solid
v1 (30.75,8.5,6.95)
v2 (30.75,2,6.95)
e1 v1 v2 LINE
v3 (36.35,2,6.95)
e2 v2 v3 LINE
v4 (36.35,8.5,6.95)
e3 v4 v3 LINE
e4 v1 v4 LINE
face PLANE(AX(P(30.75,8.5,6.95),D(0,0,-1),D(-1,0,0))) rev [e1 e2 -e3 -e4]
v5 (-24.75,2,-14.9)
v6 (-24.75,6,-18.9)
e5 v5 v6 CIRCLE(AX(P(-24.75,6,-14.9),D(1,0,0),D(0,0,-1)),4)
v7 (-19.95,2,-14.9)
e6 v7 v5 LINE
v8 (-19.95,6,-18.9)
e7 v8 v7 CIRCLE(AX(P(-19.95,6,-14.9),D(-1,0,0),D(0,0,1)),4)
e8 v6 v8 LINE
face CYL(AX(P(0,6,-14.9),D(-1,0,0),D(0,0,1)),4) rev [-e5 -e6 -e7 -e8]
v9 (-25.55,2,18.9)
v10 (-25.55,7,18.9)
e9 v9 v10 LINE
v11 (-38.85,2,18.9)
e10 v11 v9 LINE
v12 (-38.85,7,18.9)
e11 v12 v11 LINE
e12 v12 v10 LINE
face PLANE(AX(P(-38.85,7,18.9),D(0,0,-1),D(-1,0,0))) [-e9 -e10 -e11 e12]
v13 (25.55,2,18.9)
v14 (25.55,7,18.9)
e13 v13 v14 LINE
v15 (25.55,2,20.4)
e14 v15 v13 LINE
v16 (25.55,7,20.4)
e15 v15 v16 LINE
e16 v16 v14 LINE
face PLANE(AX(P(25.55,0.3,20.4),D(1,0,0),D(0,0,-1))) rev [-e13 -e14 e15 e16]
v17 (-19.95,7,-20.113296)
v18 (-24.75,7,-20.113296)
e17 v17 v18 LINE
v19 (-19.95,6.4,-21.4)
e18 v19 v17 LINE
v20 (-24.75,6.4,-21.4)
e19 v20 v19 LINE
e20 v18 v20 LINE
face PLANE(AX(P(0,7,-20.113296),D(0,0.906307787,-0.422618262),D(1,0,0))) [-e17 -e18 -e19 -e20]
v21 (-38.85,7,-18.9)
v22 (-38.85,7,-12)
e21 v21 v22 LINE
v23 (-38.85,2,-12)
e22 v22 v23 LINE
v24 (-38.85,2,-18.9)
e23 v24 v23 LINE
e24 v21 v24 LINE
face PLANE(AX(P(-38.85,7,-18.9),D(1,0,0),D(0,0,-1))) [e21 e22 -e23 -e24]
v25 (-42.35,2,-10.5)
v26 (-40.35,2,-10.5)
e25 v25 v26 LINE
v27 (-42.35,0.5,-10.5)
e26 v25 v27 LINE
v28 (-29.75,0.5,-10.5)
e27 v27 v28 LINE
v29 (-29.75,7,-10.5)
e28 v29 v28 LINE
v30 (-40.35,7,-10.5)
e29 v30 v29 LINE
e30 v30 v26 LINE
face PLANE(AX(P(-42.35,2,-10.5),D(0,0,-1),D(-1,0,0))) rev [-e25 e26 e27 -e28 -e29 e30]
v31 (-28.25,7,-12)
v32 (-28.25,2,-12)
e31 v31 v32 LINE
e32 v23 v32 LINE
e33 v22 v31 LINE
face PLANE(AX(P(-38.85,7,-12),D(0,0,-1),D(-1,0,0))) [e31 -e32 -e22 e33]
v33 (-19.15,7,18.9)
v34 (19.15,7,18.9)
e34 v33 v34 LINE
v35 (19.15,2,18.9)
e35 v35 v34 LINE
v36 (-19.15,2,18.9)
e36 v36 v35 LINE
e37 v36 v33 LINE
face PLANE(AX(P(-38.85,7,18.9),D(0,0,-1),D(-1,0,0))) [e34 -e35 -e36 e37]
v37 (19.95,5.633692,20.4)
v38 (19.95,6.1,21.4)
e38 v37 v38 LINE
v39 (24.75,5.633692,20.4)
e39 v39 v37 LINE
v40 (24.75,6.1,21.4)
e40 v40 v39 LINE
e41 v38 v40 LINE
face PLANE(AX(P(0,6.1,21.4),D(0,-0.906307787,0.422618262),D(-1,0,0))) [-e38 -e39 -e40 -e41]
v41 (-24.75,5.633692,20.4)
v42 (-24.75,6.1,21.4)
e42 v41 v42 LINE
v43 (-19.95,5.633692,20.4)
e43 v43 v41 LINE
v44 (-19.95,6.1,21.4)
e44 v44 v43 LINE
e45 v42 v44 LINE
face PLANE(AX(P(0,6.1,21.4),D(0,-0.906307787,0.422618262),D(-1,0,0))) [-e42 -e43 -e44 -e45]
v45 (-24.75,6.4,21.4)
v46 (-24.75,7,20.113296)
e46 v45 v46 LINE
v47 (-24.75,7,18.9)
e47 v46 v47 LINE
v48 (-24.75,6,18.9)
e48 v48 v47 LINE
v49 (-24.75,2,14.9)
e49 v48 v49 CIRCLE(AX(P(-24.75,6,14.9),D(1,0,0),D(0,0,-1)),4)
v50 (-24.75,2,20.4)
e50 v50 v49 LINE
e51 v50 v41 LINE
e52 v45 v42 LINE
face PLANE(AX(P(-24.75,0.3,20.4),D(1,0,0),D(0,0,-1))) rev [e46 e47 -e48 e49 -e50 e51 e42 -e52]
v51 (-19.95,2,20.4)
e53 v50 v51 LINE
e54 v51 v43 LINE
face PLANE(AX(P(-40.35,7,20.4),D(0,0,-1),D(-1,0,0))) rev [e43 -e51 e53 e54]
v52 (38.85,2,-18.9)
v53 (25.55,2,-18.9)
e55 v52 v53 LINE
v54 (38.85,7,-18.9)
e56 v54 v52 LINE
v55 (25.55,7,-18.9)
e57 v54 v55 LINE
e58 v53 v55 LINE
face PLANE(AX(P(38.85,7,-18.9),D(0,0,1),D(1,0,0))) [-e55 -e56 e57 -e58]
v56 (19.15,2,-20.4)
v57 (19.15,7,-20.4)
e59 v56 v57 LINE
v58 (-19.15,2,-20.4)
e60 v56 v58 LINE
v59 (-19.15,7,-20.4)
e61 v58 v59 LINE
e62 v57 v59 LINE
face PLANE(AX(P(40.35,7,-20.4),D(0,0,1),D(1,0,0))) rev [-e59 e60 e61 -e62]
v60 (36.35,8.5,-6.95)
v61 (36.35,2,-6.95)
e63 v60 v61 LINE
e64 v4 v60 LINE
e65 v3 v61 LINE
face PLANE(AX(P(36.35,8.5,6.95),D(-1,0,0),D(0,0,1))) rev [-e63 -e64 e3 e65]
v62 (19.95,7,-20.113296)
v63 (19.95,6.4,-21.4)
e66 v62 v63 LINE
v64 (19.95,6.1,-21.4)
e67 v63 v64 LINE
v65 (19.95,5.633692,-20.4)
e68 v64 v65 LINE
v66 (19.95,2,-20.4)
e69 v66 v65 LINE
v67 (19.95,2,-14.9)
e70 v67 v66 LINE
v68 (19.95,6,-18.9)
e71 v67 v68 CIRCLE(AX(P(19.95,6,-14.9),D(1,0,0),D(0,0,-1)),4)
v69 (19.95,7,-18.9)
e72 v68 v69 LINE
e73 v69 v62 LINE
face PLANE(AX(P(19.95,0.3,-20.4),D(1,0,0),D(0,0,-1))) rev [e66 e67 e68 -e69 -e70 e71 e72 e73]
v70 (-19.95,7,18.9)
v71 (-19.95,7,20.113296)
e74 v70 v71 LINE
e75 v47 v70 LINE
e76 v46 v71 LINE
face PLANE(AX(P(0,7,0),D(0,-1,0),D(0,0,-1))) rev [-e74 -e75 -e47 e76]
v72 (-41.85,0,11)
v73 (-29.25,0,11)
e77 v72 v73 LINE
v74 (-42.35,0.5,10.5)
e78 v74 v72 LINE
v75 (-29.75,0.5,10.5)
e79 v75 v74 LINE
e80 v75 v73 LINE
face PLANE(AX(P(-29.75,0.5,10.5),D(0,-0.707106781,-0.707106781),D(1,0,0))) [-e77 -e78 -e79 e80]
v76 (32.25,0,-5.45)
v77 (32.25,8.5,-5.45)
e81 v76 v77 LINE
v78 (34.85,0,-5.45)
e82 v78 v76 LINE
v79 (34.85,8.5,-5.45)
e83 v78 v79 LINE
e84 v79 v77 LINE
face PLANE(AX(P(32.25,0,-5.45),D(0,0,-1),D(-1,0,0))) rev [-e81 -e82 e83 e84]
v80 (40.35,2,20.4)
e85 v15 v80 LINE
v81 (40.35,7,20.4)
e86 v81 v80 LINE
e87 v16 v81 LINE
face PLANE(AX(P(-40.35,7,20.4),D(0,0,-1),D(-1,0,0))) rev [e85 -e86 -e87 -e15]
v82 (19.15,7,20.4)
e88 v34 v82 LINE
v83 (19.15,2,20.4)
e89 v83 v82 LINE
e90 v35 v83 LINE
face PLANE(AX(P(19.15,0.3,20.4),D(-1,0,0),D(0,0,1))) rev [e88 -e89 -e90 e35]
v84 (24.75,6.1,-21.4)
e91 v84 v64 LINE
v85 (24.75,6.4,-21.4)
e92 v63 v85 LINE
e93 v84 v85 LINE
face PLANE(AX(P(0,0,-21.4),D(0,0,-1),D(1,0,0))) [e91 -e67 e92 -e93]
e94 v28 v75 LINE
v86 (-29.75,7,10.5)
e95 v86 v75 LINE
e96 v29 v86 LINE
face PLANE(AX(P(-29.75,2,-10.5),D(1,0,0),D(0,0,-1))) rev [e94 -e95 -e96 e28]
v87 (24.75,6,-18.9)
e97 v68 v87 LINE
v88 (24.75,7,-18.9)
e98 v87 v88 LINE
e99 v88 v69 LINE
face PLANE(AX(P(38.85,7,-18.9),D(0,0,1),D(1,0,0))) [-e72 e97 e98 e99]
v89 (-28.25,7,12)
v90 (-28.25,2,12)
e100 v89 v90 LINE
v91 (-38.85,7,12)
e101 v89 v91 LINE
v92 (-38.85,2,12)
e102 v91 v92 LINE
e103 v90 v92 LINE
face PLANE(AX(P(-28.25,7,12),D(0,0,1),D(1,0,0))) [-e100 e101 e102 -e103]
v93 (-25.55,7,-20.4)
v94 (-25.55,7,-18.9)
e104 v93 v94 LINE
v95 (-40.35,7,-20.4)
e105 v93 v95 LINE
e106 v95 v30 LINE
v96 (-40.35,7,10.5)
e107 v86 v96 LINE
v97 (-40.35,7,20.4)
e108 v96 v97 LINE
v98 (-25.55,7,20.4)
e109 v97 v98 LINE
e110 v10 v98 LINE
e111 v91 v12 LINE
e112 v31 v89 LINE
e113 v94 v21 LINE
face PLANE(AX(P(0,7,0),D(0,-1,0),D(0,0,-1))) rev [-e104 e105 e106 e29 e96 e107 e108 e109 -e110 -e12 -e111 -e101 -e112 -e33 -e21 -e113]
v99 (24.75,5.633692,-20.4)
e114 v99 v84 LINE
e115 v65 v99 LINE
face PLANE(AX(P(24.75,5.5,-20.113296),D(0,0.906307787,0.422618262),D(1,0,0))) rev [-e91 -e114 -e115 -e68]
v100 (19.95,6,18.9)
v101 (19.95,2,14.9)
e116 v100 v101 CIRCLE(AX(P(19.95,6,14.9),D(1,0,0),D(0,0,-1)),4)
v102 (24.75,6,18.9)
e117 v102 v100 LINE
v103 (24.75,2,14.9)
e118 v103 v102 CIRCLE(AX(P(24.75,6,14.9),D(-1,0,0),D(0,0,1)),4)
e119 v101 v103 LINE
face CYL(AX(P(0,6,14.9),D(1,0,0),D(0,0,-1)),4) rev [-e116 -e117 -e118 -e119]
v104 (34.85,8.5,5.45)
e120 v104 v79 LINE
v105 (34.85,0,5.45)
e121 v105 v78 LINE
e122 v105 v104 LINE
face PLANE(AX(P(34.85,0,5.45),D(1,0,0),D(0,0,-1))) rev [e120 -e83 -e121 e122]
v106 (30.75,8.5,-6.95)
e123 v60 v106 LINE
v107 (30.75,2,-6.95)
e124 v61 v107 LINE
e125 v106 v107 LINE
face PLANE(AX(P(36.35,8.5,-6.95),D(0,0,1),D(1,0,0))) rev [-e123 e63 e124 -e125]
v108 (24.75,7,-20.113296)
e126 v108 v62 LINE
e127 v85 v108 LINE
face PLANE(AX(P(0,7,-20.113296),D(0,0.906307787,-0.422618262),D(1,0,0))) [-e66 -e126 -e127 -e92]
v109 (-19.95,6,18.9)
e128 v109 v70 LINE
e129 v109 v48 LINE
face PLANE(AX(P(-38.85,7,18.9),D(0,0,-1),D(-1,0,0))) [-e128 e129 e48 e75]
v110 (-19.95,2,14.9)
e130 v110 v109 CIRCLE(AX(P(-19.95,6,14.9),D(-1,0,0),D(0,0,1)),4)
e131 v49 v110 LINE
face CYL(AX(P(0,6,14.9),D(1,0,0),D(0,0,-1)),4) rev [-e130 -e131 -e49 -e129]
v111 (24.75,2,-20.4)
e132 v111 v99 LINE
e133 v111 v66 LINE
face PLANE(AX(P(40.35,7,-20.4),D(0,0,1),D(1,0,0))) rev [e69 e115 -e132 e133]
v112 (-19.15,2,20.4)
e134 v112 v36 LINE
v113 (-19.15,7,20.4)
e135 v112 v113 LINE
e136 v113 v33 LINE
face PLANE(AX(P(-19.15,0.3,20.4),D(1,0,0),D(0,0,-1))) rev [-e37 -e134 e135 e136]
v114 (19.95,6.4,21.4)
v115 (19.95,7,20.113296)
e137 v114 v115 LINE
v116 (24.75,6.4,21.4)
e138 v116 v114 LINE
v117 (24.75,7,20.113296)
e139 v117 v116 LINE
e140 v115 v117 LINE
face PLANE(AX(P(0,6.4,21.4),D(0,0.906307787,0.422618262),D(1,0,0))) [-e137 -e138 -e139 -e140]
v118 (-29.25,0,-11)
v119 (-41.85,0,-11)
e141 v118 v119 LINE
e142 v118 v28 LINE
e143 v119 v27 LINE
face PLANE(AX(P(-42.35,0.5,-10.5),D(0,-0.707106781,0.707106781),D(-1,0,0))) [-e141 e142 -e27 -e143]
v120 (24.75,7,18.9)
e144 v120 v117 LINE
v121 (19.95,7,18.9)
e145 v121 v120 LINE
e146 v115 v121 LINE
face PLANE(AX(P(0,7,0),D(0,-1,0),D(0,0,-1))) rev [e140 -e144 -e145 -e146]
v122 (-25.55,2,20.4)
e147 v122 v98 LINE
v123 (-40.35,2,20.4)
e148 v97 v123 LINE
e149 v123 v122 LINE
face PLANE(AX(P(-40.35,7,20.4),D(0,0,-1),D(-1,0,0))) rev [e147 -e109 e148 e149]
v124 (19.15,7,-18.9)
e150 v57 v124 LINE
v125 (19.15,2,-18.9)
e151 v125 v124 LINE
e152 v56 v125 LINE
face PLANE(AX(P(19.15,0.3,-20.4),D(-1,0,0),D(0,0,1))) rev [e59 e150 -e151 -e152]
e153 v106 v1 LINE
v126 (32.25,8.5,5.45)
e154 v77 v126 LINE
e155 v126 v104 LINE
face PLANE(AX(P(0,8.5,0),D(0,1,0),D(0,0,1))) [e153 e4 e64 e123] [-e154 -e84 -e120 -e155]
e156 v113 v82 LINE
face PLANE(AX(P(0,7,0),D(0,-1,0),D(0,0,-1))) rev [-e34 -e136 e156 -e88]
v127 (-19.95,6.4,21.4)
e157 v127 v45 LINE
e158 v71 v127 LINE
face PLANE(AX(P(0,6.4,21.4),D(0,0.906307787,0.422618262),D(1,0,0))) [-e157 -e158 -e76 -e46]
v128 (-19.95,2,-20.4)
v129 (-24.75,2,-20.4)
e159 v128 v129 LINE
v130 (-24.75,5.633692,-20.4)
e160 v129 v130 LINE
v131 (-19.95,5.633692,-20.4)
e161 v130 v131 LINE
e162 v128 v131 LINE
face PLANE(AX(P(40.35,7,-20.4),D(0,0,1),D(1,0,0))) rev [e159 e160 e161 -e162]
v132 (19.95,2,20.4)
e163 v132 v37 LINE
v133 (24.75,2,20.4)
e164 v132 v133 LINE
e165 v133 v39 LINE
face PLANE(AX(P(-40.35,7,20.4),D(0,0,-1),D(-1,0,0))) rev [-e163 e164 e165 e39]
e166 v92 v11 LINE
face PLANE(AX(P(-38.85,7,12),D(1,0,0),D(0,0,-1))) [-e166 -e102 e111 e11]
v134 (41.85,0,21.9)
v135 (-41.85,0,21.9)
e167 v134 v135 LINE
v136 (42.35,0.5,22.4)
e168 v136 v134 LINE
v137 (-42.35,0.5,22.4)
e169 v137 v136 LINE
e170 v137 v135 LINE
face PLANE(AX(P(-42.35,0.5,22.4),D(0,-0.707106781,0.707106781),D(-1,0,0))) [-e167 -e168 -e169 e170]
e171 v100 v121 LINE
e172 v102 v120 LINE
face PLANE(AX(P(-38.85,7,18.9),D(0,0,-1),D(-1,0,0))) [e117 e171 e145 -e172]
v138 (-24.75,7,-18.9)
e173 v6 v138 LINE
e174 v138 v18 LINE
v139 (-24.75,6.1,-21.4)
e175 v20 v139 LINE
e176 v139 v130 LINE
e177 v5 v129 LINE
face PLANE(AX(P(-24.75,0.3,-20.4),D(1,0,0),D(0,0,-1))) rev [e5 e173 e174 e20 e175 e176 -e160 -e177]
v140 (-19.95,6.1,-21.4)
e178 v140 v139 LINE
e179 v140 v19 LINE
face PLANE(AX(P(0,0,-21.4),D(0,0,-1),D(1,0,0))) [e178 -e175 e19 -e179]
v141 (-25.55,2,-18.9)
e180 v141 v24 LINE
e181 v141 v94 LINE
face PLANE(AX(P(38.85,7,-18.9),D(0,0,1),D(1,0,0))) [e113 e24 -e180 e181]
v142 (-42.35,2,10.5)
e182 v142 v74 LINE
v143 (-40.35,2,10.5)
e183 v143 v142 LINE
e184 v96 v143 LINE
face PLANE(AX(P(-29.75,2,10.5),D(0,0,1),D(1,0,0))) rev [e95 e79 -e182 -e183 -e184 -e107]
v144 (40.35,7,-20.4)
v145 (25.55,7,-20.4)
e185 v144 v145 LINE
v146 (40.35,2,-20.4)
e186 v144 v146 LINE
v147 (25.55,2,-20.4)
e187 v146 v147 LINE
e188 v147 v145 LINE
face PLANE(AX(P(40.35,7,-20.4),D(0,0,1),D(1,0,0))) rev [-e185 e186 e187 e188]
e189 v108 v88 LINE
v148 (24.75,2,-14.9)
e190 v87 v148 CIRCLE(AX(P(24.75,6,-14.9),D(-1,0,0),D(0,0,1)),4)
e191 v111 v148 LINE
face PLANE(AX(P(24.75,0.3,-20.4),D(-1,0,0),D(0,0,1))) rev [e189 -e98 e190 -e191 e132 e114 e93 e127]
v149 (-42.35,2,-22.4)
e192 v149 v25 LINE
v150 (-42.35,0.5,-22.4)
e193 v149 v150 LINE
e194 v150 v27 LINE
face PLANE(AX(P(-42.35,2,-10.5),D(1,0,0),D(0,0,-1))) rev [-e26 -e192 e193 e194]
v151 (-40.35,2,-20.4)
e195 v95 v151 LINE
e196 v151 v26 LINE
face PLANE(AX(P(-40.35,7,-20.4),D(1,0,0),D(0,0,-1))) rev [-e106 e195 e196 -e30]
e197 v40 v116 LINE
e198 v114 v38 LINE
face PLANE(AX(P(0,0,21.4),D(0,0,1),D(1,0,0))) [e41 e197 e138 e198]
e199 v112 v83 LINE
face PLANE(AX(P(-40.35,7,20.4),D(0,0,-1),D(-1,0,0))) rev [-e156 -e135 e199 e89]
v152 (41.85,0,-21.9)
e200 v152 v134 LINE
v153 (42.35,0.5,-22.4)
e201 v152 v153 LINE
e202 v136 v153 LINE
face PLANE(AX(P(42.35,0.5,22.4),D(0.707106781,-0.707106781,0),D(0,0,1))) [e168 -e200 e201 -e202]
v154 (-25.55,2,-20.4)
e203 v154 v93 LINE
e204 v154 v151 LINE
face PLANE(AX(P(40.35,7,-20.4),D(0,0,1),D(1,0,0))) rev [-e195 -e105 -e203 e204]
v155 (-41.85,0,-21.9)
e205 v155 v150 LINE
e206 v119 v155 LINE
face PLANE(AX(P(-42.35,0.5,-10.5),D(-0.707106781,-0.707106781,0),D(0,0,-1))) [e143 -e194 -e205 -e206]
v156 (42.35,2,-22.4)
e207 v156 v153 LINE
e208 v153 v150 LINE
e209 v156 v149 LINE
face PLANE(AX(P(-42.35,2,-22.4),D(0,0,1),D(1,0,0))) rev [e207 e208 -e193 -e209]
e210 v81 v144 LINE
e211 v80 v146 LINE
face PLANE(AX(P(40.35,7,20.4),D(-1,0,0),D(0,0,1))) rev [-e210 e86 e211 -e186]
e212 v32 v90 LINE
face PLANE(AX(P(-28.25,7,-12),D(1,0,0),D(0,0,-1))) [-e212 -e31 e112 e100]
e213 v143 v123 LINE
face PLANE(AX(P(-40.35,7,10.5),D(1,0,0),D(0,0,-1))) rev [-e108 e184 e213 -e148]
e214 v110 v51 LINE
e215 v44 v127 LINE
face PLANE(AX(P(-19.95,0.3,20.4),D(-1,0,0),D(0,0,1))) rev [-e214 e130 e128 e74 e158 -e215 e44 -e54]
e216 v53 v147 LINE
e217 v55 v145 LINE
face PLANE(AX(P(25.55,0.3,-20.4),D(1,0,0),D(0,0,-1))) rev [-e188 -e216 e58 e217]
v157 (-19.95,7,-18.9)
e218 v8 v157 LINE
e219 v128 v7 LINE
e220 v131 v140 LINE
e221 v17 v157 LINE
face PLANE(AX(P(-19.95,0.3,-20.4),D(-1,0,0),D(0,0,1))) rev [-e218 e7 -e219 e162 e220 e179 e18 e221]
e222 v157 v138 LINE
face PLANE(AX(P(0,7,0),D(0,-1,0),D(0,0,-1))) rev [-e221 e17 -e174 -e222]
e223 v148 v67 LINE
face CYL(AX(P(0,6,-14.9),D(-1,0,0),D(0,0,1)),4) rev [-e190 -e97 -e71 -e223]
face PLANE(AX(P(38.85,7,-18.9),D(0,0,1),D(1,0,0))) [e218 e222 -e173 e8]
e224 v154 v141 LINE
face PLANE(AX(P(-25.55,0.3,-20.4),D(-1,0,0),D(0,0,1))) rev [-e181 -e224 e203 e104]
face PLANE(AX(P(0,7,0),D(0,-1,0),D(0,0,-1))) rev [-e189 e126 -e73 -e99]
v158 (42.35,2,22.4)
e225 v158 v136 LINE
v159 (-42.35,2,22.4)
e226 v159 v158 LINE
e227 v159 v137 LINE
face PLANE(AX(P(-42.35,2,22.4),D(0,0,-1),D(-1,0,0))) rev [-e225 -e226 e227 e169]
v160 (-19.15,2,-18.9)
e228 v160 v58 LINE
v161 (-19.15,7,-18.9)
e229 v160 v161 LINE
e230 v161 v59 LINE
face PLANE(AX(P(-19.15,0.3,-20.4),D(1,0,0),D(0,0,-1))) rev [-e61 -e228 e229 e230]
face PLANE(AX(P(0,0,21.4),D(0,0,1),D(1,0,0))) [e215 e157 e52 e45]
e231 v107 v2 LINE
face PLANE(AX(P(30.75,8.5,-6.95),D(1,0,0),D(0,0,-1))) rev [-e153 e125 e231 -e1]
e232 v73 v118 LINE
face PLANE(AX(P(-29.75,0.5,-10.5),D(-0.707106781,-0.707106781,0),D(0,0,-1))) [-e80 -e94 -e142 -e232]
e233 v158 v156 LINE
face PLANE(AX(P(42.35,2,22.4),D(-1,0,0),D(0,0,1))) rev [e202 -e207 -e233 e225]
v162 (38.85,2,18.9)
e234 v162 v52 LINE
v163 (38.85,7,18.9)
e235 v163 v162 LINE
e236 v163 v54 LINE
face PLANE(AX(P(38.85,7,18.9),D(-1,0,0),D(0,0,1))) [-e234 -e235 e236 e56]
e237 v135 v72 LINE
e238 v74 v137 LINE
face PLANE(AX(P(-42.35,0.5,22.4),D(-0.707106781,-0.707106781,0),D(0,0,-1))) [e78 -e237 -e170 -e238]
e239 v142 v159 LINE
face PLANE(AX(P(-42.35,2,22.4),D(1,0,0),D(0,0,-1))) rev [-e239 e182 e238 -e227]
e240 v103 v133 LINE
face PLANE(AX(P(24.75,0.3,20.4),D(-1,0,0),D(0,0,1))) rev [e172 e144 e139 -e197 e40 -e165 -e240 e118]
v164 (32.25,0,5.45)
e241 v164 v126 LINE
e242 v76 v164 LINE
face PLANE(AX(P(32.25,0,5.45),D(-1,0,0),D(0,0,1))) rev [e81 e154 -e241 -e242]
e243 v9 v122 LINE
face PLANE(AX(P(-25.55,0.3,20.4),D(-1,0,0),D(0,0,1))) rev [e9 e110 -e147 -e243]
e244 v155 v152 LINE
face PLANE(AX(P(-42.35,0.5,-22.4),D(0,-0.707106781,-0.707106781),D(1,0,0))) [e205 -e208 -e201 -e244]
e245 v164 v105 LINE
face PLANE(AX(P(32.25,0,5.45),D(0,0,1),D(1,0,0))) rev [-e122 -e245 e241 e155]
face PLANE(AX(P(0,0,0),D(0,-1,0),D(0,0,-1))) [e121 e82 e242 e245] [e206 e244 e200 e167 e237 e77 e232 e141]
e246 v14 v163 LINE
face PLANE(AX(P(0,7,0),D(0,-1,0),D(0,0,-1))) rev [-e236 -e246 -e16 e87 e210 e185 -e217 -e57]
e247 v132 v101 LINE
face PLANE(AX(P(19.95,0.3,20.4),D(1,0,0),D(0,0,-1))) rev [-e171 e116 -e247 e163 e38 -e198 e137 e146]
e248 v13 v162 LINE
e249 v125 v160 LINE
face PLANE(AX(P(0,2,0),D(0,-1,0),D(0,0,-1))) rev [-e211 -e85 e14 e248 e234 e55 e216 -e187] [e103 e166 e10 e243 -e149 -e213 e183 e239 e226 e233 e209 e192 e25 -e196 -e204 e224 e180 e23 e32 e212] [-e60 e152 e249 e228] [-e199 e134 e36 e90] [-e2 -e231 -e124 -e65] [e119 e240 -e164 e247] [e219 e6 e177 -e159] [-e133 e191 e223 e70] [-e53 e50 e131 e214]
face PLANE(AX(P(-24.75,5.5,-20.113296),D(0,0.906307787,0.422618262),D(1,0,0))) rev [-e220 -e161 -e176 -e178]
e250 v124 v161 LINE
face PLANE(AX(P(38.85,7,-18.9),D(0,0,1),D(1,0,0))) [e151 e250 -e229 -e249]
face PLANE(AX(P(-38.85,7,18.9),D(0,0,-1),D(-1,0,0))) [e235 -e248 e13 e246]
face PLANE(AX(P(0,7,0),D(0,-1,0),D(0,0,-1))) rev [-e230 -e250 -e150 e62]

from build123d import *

# Parameters (mm, degrees)
BOSS_EXTRUDE1_DEPTH = 2
BOSS_EXTRUDE2_DEPTH = 5
SKETCH3_W           = 0.8
SKETCH3_H           = 1.5
CUT_EXTRUDE1_DEPTH  = 5
SKETCH4_W           = 4.8
SKETCH4_H           = 1.5
BOSS_EXTRUDE3_DEPTH = 1
CHAMFER3_SIZE       = 0.6
CHAMFER3_SIZE_2     = 1.286704152
SKETCH6_W           = 2.6
SKETCH6_H           = 10.9
CUT_EXTRUDE2_DEPTH  = 49.169310769
SKETCH7_W           = 5.6
SKETCH7_H           = 13.9
SKETCH7_W_2         = 2.6
SKETCH7_H_2         = 10.9
BOSS_EXTRUDE4_DEPTH = 6.5
CHAMFER6_SIZE       = 0.5
FILLET1_R           = 4


with BuildPart() as part:
    # Sketch1 → Boss-Extrude1 (new body)
    with BuildSketch(Plane(origin=(0, 0, 0), x_dir=(1, 0, 0), z_dir=(0, 1, 0))):
        Polygon((-42.35, 10.5), (-29.75, 10.5), (-29.75, -10.5), (-42.35, -10.5), (-42.35, -22.4), (42.35, -22.4), (42.35, 22.4), (-42.35, 22.4), align=None)
    extrude(amount=BOSS_EXTRUDE1_DEPTH)

    # Sketch2 → Boss-Extrude2 (add)
    with BuildSketch(Plane(origin=(0, 2, 0), x_dir=(1, 0, 0), z_dir=(0, 1, 0))):
        Polygon((-40.35, 20.4), (-40.35, 10.5), (-29.75, 10.5), (-29.75, -10.5), (-40.35, -10.5), (-40.35, -20.4), (40.35, -20.4), (40.35, 20.4), align=None)
        Polygon((-38.85, -12), (-38.85, -18.9), (38.85, -18.9), (38.85, 18.9), (-38.85, 18.9), (-38.85, 12), (-28.25, 12), (-28.25, -12), align=None, mode=Mode.SUBTRACT)
    extrude(amount=BOSS_EXTRUDE2_DEPTH)

    # Sketch3 → Cut-Extrude1 (cut)
    with BuildSketch(Plane(origin=(0, 7, 0), x_dir=(1, 0, 0), z_dir=(0, 1, 0))):
        with Locations((-25.15, 19.65)):
            Rectangle(SKETCH3_W, SKETCH3_H)
        with Locations((-19.55, 19.65)):
            Rectangle(SKETCH3_W, SKETCH3_H)
        with Locations((-19.55, -19.65)):
            Rectangle(SKETCH3_W, SKETCH3_H)
        with Locations((-25.15, -19.65)):
            Rectangle(SKETCH3_W, SKETCH3_H)
        with Locations((19.55, 19.65)):
            Rectangle(SKETCH3_W, SKETCH3_H)
        with Locations((25.15, 19.65)):
            Rectangle(SKETCH3_W, SKETCH3_H)
        with Locations((25.15, -19.65)):
            Rectangle(SKETCH3_W, SKETCH3_H)
        with Locations((19.55, -19.65)):
            Rectangle(SKETCH3_W, SKETCH3_H)
    extrude(amount=-CUT_EXTRUDE1_DEPTH, mode=Mode.SUBTRACT)

    # Sketch4 → Boss-Extrude3 (add)
    with BuildSketch(Plane.XY.offset(20.4)):
        with Locations((-22.35, 6.25)):
            Rectangle(SKETCH4_W, SKETCH4_H)
        with Locations((22.35, 6.25)):
            Rectangle(SKETCH4_W, SKETCH4_H)
    boss_extrude3 = extrude(amount=BOSS_EXTRUDE3_DEPTH)

    # Mirror1: Boss-Extrude3 across plane
    add(boss_extrude3.mirror(Plane.XY))

    # Chamfer3
    # the kernel refuses this chamfer: 1.286704152, 0.6 mm, written as the material it takes off along each edge
    with BuildSketch(Plane(origin=(16.616181102, 5.5, -21.4), x_dir=(0, 0.9971975577536771, -0.07481330637060246), z_dir=(1, 0, 0))) as chamfer3_piece_1_section:
        Polygon((CHAMFER3_SIZE * 0.997197557754, CHAMFER3_SIZE * 0.0748133063706), (-CHAMFER3_SIZE_2 * 0.0748133063884, CHAMFER3_SIZE_2 * 0.997197557991), (0, 0), align=None)
    chamfer3_piece_1 = extrude(amount=11.467637795, mode=Mode.PRIVATE)
    chamfer3_piece_1 = split(chamfer3_piece_1, bisect_by=Plane(origin=(22.35, 5.708120407, -20.4), z_dir=(0, 0, -1)), keep=Keep.TOP, mode=Mode.PRIVATE)
    add(chamfer3_piece_1, mode=Mode.SUBTRACT)
    with BuildSketch(Plane(origin=(28.083818898, 7, -21.4), x_dir=(0, 0.016311164131109942, 0.9998669641130704), z_dir=(-1, 0, 0))) as chamfer3_piece_2_section:
        Polygon((CHAMFER3_SIZE_2 * 0.999866964351, -CHAMFER3_SIZE_2 * 0.016311164135), (-CHAMFER3_SIZE * 0.0163111641311, -CHAMFER3_SIZE * 0.999866964113), (0, 0), align=None)
    chamfer3_piece_2 = extrude(amount=8.133818898, mode=Mode.PRIVATE)
    chamfer3_piece_2 = split(chamfer3_piece_2, bisect_by=Plane(origin=(25.55, 6.955435886, -20.304431949), z_dir=(-1, 0, 0)), keep=Keep.TOP, mode=Mode.PRIVATE)
    add(chamfer3_piece_2, mode=Mode.SUBTRACT)
    with BuildSketch(Plane(origin=(-16.616181102, 5.5, -21.4), x_dir=(0, 0.9971975577536771, -0.07481330637060246), z_dir=(-1, 0, 0))) as chamfer3_piece_3_section:
        Polygon((CHAMFER3_SIZE * 0.997197557754, -CHAMFER3_SIZE * 0.0748133063706), (-CHAMFER3_SIZE_2 * 0.0748133063884, -CHAMFER3_SIZE_2 * 0.997197557991), (0, 0), align=None)
    chamfer3_piece_3 = extrude(amount=11.467637795, mode=Mode.PRIVATE)
    chamfer3_piece_3 = split(chamfer3_piece_3, bisect_by=Plane(origin=(-22.35, 5.708120407, -20.4), z_dir=(0, 0, -1)), keep=Keep.TOP, mode=Mode.PRIVATE)
    add(chamfer3_piece_3, mode=Mode.SUBTRACT)
    with BuildSketch(Plane(origin=(-24.75, 7, -21.4), x_dir=(0, 0.016311164131109942, 0.9998669641130704), z_dir=(1, 0, 0))) as chamfer3_piece_4_section:
        Polygon((CHAMFER3_SIZE_2 * 0.999866964351, CHAMFER3_SIZE_2 * 0.016311164135), (-CHAMFER3_SIZE * 0.0163111641311, CHAMFER3_SIZE * 0.999866964113), (0, 0), align=None)
    chamfer3_piece_4 = extrude(amount=8.133818898, mode=Mode.PRIVATE)
    chamfer3_piece_4 = split(chamfer3_piece_4, bisect_by=Plane(origin=(-19.15, 6.955435886, -20.304431949), z_dir=(-1, 0, 0)), keep=Keep.TOP, mode=Mode.PRIVATE)
    add(chamfer3_piece_4, mode=Mode.SUBTRACT)
    with BuildSketch(Plane(origin=(16.616181102, 5.5, 21.4), x_dir=(0, 0.9971975577536771, 0.07481330637060246), z_dir=(1, 0, 0))) as chamfer3_piece_5_section:
        Polygon((CHAMFER3_SIZE * 0.997197557754, -CHAMFER3_SIZE * 0.0748133063706), (-CHAMFER3_SIZE_2 * 0.0748133063884, -CHAMFER3_SIZE_2 * 0.997197557991), (0, 0), align=None)
    chamfer3_piece_5 = extrude(amount=11.467637795, mode=Mode.PRIVATE)
    chamfer3_piece_5 = split(chamfer3_piece_5, bisect_by=Plane(origin=(22.35, 5.708120407, 20.4), z_dir=(0, 0, 1)), keep=Keep.TOP, mode=Mode.PRIVATE)
    add(chamfer3_piece_5, mode=Mode.SUBTRACT)
    with BuildSketch(Plane(origin=(24.75, 7, 21.4), x_dir=(0, 0.016311164131109942, -0.9998669641130704), z_dir=(-1, 0, 0))) as chamfer3_piece_6_section:
        Polygon((CHAMFER3_SIZE_2 * 0.999866964351, CHAMFER3_SIZE_2 * 0.016311164135), (-CHAMFER3_SIZE * 0.0163111641311, CHAMFER3_SIZE * 0.999866964113), (0, 0), align=None)
    chamfer3_piece_6 = extrude(amount=8.133818898, mode=Mode.PRIVATE)
    chamfer3_piece_6 = split(chamfer3_piece_6, bisect_by=Plane(origin=(19.15, 6.955435886, 20.304431949), z_dir=(1, 0, 0)), keep=Keep.TOP, mode=Mode.PRIVATE)
    add(chamfer3_piece_6, mode=Mode.SUBTRACT)
    with BuildSketch(Plane(origin=(-24.75, 7, 21.4), x_dir=(0, 0.016311164131109942, -0.9998669641130704), z_dir=(1, 0, 0))) as chamfer3_piece_7:
        Polygon((CHAMFER3_SIZE_2 * 0.999866964351, -CHAMFER3_SIZE_2 * 0.016311164135), (-CHAMFER3_SIZE * 0.0163111641311, -CHAMFER3_SIZE * 0.999866964113), (0, 0), align=None)
    extrude(amount=4.8, mode=Mode.SUBTRACT)
    with BuildSketch(Plane(origin=(-16.616181102, 5.5, 21.4), x_dir=(0, 0.9971975577536771, 0.07481330637060246), z_dir=(-1, 0, 0))) as chamfer3_piece_8_section:
        Polygon((CHAMFER3_SIZE * 0.997197557754, CHAMFER3_SIZE * 0.0748133063706), (-CHAMFER3_SIZE_2 * 0.0748133063884, CHAMFER3_SIZE_2 * 0.997197557991), (0, 0), align=None)
    chamfer3_piece_8 = extrude(amount=11.467637795, mode=Mode.PRIVATE)
    chamfer3_piece_8 = split(chamfer3_piece_8, bisect_by=Plane(origin=(-22.35, 5.708120407, 20.4), z_dir=(0, 0, 1)), keep=Keep.TOP, mode=Mode.PRIVATE)
    add(chamfer3_piece_8, mode=Mode.SUBTRACT)

    # Sketch6 → Cut-Extrude2 (cut, through all)
    with BuildSketch(Plane(origin=(0, 2, 0), x_dir=(1, 0, 0), z_dir=(0, 1, 0))):
        with Locations((33.55, 0)):
            Rectangle(SKETCH6_W, SKETCH6_H)
    extrude(amount=-CUT_EXTRUDE2_DEPTH, mode=Mode.SUBTRACT)

    # Sketch7 → Boss-Extrude4 (add)
    with BuildSketch(Plane(origin=(0, 2, 0), x_dir=(1, 0, 0), z_dir=(0, 1, 0))):
        with Locations((33.55, 0)):
            Rectangle(SKETCH7_W, SKETCH7_H)
        with Locations((33.55, 0)):
            Rectangle(SKETCH7_W_2, SKETCH7_H_2, mode=Mode.SUBTRACT)
    extrude(amount=BOSS_EXTRUDE4_DEPTH)

    # Chamfer6
    chamfer6_edges = [part.edges().sort_by_distance(p)[0] for p in [
        (-36.05, 0, -10.5),
        (-42.35, 0, -16.45),
        (0, 0, -22.4),
        (42.35, 0, 0),
        (0, 0, 22.4),
        (-42.35, 0, 16.45),
        (-36.05, 0, 10.5),
        (-29.75, 0, 0),
    ]]
    chamfer(chamfer6_edges, length=CHAMFER6_SIZE)

    # Fillet1
    fillet1_edges = [part.edges().sort_by_distance(p)[0] for p in [
        (-22.35, 2, 18.9),
        (22.35, 2, 18.9),
        (22.35, 2, -18.9),
        (-22.35, 2, -18.9),
    ]]
    fillet(fillet1_edges, radius=FILLET1_R)


solid = part.part
